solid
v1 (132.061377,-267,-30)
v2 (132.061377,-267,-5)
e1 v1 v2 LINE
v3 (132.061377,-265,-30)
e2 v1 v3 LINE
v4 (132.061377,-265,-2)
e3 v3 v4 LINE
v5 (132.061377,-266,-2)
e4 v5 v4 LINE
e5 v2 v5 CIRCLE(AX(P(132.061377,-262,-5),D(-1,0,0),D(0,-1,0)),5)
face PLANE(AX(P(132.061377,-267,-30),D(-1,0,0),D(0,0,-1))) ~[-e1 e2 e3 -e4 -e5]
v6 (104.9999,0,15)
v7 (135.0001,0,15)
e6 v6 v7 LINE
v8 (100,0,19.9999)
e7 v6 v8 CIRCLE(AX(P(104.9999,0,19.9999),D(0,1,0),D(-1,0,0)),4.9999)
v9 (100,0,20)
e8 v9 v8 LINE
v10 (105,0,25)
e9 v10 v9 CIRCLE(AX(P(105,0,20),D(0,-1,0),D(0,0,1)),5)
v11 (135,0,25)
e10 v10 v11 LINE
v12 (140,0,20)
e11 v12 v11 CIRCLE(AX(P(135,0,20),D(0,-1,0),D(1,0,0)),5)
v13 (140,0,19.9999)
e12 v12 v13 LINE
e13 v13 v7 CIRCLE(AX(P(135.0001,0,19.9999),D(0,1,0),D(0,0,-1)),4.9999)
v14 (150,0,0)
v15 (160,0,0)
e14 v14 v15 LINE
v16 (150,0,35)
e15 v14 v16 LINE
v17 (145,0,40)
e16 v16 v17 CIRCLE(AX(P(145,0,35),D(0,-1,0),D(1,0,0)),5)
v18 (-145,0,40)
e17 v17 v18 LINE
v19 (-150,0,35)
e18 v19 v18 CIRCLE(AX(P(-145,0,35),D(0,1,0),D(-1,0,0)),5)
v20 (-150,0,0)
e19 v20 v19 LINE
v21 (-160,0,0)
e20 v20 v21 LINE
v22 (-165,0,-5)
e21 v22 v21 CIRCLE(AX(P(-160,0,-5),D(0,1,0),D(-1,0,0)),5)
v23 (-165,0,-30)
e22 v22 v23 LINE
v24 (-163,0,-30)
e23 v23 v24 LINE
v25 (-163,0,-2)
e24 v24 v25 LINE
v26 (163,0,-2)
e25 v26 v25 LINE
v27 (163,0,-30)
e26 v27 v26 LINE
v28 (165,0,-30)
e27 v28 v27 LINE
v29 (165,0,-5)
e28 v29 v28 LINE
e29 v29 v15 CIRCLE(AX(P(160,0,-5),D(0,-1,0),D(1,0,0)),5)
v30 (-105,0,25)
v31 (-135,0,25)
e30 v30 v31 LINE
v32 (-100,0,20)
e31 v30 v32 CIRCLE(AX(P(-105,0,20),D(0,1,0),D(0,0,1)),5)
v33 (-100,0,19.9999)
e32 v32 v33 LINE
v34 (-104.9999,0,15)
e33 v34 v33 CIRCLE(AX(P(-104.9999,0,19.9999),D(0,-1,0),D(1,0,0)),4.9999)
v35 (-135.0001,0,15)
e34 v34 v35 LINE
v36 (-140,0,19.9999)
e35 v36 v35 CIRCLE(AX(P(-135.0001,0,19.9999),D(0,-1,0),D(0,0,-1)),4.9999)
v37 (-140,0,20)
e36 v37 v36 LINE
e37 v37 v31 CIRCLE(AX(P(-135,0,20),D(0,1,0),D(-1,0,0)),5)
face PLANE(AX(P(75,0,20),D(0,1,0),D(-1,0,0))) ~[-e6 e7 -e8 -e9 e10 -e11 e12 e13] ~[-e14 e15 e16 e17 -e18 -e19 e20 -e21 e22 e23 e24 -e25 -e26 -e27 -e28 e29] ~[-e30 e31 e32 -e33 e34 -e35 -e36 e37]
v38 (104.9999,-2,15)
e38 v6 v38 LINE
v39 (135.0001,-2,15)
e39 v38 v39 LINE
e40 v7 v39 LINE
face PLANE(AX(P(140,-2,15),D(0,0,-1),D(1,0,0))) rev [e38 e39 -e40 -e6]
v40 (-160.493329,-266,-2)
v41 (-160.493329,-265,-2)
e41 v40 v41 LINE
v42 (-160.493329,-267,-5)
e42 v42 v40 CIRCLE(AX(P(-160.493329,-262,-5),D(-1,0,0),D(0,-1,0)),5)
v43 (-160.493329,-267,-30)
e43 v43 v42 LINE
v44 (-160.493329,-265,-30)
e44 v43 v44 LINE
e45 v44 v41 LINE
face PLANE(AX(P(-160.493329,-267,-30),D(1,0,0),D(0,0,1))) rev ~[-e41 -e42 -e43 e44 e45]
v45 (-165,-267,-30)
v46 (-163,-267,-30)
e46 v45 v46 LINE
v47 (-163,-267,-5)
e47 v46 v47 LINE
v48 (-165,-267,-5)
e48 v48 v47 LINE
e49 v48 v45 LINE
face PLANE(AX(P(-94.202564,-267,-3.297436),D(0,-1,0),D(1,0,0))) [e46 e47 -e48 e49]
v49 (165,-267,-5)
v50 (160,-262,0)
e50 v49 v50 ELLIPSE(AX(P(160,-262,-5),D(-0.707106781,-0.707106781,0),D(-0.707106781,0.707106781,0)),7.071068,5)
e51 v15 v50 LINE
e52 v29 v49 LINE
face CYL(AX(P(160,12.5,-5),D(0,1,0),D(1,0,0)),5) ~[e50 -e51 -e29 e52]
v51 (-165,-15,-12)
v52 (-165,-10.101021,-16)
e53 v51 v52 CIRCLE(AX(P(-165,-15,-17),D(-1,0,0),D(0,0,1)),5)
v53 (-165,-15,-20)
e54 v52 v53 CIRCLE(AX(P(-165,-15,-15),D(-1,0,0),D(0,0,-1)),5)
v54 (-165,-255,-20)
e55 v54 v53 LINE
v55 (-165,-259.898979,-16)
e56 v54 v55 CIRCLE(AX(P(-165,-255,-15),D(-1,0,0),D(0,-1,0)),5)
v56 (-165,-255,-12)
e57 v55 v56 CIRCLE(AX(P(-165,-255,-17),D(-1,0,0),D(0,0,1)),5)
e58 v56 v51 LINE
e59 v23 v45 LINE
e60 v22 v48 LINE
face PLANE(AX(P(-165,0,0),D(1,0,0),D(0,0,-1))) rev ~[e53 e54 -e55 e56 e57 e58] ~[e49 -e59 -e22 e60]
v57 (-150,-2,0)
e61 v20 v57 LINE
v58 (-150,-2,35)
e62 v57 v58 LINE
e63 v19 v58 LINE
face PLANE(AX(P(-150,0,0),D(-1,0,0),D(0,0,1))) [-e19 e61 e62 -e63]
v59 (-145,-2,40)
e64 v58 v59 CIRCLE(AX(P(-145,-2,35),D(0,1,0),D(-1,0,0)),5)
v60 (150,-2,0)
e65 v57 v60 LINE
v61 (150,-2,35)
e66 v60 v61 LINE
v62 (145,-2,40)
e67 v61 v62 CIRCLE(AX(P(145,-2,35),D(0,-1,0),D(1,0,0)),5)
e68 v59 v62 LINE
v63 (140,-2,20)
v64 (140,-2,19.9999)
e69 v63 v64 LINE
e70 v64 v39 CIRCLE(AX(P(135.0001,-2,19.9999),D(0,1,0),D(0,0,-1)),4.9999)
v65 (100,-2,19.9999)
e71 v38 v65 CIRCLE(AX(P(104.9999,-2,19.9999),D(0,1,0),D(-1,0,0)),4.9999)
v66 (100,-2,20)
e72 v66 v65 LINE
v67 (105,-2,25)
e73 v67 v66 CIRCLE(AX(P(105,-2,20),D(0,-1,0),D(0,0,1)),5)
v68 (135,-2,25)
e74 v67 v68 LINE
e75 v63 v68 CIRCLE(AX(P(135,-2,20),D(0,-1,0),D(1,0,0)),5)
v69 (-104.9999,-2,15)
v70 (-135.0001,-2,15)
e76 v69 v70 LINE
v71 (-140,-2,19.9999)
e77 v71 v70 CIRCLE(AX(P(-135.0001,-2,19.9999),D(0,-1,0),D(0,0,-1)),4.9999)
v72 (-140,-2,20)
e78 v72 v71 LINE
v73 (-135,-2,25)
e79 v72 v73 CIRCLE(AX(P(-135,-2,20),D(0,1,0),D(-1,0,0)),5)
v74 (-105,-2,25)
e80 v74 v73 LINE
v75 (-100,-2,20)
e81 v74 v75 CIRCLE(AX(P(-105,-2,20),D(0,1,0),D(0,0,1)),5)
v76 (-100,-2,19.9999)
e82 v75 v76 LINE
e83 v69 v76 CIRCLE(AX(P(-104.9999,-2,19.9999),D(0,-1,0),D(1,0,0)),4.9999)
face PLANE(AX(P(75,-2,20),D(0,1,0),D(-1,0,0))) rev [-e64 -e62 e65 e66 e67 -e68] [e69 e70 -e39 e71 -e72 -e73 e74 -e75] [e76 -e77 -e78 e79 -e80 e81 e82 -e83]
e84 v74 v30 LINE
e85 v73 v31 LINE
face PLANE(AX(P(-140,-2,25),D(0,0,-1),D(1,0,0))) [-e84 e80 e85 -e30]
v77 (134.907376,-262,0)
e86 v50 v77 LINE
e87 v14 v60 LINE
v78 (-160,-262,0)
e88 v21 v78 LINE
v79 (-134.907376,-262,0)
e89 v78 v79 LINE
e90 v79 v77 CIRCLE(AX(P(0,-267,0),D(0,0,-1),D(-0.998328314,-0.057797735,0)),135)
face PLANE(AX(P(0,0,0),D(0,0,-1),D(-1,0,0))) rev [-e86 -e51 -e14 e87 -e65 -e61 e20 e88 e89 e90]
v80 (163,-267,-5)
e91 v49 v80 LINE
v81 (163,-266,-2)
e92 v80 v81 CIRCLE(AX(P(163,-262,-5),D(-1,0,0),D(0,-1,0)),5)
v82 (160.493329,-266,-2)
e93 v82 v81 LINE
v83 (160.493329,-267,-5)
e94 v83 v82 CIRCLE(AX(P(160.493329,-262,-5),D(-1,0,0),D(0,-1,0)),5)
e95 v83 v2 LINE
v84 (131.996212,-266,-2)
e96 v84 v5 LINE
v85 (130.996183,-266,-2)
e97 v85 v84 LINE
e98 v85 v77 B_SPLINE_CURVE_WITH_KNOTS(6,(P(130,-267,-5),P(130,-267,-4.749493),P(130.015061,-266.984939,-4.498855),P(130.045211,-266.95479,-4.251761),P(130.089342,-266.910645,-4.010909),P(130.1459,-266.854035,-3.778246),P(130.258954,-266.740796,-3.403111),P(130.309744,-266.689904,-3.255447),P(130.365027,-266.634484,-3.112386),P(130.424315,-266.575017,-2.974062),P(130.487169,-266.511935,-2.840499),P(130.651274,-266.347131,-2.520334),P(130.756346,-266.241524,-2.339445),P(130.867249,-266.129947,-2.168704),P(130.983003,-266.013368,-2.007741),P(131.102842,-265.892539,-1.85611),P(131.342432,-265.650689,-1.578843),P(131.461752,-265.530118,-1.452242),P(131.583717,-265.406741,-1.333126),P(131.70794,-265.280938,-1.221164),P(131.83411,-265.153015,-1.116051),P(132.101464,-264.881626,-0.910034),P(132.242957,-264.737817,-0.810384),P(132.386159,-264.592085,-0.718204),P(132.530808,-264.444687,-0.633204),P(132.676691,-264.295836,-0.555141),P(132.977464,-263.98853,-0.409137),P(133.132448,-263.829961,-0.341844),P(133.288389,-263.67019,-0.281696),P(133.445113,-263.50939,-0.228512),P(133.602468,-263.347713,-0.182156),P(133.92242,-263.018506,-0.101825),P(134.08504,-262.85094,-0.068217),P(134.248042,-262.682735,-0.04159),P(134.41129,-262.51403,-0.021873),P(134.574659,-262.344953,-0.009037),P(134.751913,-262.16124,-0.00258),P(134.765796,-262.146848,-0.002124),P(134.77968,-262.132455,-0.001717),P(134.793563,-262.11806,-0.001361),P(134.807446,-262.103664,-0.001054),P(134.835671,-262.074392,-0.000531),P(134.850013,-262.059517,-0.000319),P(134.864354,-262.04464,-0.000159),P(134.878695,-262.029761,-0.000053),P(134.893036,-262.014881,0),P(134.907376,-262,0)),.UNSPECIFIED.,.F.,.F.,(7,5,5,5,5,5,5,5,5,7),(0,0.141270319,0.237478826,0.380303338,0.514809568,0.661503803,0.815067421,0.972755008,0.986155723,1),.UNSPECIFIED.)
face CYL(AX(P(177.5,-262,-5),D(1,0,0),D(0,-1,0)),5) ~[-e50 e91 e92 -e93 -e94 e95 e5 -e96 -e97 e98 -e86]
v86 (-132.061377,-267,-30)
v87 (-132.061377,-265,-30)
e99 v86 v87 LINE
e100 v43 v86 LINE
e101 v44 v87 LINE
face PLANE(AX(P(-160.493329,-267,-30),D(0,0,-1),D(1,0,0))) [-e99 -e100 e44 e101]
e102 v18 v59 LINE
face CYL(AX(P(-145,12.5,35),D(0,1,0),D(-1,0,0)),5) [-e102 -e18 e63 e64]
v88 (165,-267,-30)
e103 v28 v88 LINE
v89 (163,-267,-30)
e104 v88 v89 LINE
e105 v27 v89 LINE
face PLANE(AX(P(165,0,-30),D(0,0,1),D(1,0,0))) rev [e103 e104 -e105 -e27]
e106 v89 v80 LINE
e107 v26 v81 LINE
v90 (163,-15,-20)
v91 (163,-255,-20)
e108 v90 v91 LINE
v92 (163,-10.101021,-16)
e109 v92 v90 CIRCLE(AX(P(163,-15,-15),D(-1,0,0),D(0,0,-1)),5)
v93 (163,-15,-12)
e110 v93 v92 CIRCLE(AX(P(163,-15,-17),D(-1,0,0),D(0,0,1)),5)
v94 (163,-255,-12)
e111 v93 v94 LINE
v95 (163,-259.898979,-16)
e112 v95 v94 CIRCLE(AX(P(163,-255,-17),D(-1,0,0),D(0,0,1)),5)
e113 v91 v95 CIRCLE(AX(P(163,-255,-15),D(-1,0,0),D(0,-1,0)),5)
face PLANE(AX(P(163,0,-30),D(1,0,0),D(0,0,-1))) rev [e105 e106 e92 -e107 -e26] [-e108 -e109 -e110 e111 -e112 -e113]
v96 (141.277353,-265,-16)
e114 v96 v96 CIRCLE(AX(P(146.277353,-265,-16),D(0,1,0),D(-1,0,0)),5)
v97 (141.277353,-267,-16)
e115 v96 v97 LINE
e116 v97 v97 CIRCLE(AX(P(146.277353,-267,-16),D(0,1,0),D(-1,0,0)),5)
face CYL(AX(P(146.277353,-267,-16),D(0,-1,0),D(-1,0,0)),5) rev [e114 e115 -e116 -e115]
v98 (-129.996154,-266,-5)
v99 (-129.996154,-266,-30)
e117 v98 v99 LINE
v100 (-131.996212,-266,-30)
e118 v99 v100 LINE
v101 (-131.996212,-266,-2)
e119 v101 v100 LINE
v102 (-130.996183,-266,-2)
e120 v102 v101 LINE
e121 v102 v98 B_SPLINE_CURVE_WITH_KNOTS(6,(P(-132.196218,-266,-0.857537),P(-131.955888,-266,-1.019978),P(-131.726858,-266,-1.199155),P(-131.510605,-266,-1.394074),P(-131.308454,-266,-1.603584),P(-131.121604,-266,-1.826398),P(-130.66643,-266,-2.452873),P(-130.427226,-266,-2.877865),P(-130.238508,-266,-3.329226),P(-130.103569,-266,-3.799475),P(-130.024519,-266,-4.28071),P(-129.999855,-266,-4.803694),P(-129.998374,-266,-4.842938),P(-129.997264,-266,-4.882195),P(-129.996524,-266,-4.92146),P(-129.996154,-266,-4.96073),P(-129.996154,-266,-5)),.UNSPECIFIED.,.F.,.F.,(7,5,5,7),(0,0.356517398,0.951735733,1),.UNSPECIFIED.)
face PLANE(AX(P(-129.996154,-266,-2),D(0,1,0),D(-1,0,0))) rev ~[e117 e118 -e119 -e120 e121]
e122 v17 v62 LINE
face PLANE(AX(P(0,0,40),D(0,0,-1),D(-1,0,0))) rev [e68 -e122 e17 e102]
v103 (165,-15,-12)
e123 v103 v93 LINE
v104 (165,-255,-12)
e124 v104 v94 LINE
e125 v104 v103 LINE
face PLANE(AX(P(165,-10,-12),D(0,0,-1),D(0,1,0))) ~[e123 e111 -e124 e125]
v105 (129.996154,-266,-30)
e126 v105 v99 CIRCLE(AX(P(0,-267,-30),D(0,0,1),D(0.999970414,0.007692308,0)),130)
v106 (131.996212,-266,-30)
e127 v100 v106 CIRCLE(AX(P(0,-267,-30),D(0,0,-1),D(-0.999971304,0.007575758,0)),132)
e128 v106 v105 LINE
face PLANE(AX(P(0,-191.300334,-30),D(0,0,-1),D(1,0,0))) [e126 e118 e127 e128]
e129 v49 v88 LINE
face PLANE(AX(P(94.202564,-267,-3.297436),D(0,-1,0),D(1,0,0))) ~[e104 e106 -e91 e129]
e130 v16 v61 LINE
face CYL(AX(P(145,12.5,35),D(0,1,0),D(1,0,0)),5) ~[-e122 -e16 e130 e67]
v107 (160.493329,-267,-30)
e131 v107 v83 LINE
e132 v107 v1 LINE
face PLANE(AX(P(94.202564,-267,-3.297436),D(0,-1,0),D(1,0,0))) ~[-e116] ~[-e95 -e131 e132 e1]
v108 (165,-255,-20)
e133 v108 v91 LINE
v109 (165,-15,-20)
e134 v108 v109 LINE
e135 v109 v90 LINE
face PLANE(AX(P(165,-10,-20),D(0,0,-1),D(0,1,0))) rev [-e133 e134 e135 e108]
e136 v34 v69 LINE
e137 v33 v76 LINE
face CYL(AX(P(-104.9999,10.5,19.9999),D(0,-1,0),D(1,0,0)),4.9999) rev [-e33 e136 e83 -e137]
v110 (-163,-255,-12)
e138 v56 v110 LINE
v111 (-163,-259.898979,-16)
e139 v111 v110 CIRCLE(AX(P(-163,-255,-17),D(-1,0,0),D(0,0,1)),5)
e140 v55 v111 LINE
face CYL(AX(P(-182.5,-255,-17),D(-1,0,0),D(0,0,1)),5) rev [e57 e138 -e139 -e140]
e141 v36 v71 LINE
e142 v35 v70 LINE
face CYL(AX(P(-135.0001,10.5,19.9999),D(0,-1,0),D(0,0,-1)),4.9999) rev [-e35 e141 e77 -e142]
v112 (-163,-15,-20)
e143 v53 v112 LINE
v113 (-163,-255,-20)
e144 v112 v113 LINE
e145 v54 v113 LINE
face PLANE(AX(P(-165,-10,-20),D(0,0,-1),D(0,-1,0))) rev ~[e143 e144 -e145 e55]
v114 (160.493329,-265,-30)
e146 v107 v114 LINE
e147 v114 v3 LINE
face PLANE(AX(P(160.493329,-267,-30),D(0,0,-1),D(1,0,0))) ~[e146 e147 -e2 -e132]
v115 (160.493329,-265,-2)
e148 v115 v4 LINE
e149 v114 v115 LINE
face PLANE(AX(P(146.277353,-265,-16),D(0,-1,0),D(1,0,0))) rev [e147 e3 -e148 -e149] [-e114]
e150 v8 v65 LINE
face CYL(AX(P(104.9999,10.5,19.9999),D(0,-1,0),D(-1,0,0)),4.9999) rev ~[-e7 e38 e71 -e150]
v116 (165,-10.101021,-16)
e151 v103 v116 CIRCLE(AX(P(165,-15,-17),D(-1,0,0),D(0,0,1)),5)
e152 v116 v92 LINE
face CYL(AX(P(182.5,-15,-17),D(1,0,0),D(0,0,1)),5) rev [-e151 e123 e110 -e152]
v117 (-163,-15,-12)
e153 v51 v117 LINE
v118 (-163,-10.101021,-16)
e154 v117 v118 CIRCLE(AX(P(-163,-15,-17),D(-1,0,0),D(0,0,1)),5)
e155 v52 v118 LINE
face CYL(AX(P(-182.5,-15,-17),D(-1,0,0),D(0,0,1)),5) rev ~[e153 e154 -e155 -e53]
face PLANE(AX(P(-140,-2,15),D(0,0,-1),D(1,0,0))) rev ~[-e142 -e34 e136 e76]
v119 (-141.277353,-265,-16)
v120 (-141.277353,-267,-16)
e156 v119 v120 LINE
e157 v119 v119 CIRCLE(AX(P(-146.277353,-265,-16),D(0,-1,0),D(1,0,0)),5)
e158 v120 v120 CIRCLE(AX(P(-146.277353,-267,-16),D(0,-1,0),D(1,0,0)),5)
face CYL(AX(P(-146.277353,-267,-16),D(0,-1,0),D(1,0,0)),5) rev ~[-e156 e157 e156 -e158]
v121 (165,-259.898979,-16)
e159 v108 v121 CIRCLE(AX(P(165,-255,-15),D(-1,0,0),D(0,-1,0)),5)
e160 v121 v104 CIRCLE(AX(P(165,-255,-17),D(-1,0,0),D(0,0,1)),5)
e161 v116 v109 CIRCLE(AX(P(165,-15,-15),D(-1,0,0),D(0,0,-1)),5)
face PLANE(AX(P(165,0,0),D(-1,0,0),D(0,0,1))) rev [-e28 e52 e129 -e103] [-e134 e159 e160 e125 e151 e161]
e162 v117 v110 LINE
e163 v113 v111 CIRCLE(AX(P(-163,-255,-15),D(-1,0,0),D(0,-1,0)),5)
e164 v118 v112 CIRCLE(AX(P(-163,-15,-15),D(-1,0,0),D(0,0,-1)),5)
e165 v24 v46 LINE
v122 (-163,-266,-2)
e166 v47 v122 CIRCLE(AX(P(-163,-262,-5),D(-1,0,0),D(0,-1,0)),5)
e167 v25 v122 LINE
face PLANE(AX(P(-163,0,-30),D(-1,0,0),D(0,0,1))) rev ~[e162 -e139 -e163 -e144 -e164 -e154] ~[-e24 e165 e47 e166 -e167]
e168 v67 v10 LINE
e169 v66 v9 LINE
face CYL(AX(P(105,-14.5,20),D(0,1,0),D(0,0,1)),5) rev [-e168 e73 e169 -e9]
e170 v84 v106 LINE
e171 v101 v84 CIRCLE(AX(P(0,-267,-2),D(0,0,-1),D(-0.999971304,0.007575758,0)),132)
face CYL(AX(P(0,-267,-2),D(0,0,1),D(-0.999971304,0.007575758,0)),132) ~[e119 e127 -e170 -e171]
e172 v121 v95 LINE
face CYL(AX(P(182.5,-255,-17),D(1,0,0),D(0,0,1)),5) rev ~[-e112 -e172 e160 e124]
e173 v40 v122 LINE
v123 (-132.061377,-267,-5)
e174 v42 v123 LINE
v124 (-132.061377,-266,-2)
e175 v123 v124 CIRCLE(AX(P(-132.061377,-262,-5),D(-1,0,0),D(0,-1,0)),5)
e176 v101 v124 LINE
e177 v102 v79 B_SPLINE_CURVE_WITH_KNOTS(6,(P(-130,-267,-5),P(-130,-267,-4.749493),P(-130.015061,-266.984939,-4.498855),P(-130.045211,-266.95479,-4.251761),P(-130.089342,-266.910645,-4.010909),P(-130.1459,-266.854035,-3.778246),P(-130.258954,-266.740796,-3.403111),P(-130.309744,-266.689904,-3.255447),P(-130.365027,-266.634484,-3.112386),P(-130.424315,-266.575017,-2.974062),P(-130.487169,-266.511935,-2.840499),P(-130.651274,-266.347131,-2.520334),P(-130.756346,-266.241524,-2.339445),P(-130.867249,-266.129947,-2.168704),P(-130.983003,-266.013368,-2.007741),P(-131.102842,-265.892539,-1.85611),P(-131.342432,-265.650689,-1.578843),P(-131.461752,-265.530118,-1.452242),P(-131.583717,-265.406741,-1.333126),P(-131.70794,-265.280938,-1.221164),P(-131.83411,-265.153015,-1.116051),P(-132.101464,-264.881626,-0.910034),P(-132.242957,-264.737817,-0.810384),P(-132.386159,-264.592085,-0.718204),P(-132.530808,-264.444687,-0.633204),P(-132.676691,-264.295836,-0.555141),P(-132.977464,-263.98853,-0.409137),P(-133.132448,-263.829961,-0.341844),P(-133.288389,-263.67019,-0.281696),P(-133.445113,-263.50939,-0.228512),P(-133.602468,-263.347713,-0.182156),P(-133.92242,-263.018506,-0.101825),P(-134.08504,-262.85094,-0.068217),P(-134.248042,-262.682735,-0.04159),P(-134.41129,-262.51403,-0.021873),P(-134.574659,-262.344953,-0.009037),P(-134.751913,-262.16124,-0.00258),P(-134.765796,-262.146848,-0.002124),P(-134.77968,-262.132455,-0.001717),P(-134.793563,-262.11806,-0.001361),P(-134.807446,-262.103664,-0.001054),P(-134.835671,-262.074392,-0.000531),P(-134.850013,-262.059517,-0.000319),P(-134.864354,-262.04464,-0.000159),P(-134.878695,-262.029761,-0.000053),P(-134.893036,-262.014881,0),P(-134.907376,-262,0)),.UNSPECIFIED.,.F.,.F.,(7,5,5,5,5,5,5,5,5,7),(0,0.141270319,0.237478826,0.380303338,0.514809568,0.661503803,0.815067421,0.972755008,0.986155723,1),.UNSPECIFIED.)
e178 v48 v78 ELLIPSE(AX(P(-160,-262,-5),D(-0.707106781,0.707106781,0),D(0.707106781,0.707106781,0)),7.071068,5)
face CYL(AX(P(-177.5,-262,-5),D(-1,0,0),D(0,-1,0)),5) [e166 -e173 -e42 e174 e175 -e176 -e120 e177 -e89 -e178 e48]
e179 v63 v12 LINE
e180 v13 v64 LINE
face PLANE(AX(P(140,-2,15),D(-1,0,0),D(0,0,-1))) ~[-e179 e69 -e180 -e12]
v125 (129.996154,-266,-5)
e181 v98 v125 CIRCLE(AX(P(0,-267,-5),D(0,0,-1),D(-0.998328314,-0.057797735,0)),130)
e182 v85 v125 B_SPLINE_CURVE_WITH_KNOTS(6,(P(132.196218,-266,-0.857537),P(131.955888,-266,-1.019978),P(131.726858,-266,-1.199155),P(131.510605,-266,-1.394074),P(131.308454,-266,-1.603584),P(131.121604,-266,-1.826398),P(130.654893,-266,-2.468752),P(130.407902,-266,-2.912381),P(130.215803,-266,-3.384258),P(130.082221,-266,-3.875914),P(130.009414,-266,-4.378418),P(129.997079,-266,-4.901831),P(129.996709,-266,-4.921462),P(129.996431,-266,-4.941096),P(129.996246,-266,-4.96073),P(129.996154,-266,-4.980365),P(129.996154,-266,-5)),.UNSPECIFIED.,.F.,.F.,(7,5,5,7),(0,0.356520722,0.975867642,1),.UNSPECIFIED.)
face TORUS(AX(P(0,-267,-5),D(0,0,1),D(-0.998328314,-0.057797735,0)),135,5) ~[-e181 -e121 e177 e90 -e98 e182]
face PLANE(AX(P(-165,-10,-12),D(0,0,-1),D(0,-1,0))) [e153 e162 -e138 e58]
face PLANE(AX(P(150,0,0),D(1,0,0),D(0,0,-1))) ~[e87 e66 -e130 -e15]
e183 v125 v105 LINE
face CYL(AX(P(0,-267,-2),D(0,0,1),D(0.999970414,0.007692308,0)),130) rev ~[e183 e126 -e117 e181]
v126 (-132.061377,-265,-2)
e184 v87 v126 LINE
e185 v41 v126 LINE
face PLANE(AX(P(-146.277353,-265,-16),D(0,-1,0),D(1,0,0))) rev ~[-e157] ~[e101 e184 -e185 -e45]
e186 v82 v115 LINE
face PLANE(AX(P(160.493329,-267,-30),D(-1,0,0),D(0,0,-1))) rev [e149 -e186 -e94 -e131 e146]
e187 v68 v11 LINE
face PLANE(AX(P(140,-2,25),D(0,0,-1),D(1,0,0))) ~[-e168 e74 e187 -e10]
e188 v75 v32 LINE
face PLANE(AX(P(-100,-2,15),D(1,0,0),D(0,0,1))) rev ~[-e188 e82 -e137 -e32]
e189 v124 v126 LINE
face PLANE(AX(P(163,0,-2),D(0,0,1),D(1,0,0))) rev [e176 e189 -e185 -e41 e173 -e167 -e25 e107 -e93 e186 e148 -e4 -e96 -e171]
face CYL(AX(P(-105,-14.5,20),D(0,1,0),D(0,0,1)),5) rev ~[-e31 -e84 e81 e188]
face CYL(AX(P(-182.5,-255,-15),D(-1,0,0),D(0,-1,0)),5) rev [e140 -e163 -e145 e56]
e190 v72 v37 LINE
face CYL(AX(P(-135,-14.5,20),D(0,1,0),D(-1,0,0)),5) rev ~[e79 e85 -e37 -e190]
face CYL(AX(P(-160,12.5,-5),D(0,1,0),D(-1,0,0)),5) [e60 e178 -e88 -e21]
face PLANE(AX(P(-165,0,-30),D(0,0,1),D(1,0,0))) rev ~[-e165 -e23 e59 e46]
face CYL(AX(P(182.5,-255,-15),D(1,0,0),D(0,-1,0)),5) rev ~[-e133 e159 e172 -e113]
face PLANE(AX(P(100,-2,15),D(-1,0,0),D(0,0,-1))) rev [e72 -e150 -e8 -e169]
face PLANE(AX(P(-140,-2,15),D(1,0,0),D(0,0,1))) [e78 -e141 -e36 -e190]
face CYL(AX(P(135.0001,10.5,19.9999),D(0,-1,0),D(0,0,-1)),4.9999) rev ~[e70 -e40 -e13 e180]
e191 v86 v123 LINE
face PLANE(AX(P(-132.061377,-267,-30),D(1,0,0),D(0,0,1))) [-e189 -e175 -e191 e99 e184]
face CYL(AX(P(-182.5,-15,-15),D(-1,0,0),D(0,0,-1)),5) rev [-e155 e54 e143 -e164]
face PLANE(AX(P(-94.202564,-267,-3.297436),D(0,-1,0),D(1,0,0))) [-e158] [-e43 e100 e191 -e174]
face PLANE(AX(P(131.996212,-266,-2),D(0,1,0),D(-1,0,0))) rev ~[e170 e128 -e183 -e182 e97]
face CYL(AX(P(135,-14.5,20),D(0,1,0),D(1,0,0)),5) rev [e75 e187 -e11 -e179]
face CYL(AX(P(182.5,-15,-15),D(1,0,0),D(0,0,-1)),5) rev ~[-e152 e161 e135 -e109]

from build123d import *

# Parameters (mm, degrees)
F1_DEPTH       = 267
F2_W           = 250
F2_H           = 8
F3_DEPTH       = 5
F4_R           = 130
F5_DEPTH       = 12.5
F6_W           = 150
F6_H           = 40
F7_DEPTH       = 2
F8_W           = 40
F8_H           = 10
F9_DEPTH       = 12.5
F10_F1_R       = 5
F10_F2_R       = 5
F10_F3_R       = 4.9999
F10_F4_R       = 4.9999
F10_2_T1_DEPTH = 35
F11_W          = 28.4319519997
F11_H          = 28
F12_DEPTH      = 2
F13_R          = 5
F14_DEPTH      = 5
F17_T1_DEPTH   = 27
F17_T3_DEPTH   = 292
F17_T5_DEPTH   = 60
F20_DEPTH      = 28
F21_T2_ANGLE   = 186.62682558


# Not quite as in the source:
# - a fillet or chamfer that OpenCascade refuses, or shapes differently, is made with other operations: its cross-section is extruded or revolved along the edge and cut away or added
# - a fillet or chamfer is up to 0.001 mm smaller than in the source, because OpenCascade refuses the exact size


with BuildPart() as f1:
    # F0 (on Front) → F1 (new body)
    with BuildSketch(Plane.XZ):
        Polygon((-165, -30), (-163, -30), (-163, -2), (0, -2), (0, 0), (-165, 0), align=None)
    extrude(amount=F1_DEPTH)


with BuildPart() as f3:
    # F2 (on face) → F3 (new body, symmetric)
    with BuildSketch(Plane(origin=(-165, 0, 0), x_dir=(0, -1, 0), z_dir=(-1, 0, 0))):
        with Locations((135, -16)):
            Rectangle(F2_W, F2_H)
    extrude(amount=F3_DEPTH, both=True)

    # F10#2: fillet of radius 5 on 4 edges, made by hand

    # F10_2_s2 → F10_2_t1 (cut)
    with BuildSketch(Plane.YZ.offset(-182.5)):
        with BuildLine():
            ThreePointArc((-15, -12), (-11.4644660941, -13.4644660941), (-10, -17))
            Line((-10, -17), (-10, -12))
            Line((-10, -12), (-15, -12))
        make_face()
        with BuildLine():
            ThreePointArc((-15, -20), (-11.4644660941, -18.5355339059), (-10, -15))
            Line((-10, -15), (-10, -20))
            Line((-10, -20), (-15, -20))
        make_face()
        with BuildLine():
            ThreePointArc((-260, -15), (-258.5355339059, -18.5355339059), (-255, -20))
            Line((-255, -20), (-260, -20))
            Line((-260, -20), (-260, -15))
        make_face()
        with BuildLine():
            ThreePointArc((-255, -12), (-258.5355339059, -13.4644660941), (-260, -17))
            Line((-260, -17), (-260, -12))
            Line((-260, -12), (-255, -12))
        make_face()
    extrude(amount=F10_2_T1_DEPTH, mode=Mode.SUBTRACT)


with BuildPart() as f5:
    # F4 (on face) → F5 (new body, symmetric)
    with BuildSketch(Plane.XY):
        with Locations((0, -267)):
            Circle(F4_R)
    extrude(amount=F5_DEPTH, both=True)


with BuildPart() as f7:
    # F6 (on face) → F7 (new body)
    with BuildSketch(Plane(origin=(0, 0, 0), x_dir=(-1, 0, 0), z_dir=(0, 1, 0))):
        with Locations((75, 20)):
            Rectangle(F6_W, F6_H)
    extrude(amount=-F7_DEPTH)


with BuildPart() as f9:
    # F8 (on face) → F9 (new body, symmetric)
    with BuildSketch(Plane.XZ.offset(2)):
        with Locations((-120, 20)):
            Rectangle(F8_W, F8_H)
    extrude(amount=F9_DEPTH, both=True)

    # F10: fillet of radius 5 on 4 edges, made by hand

    # F10_f1
    f10_f1_edges = [f9.edges().sort_by_distance(p)[0] for p in [
        (-140, -2, 25),
    ]]
    fillet(f10_f1_edges, radius=F10_F1_R)

    # F10_f2
    f10_f2_edges = [f9.edges().sort_by_distance(p)[0] for p in [
        (-100, -2, 25),
    ]]
    fillet(f10_f2_edges, radius=F10_F2_R)

    # F10_f3 (radius 5 in the source; OpenCascade refuses exactly that, so slightly less here)
    f10_f3_edges = [f9.edges().sort_by_distance(p)[0] for p in [
        (-100, -2, 15),
    ]]
    fillet(f10_f3_edges, radius=F10_F3_R)

    # F10_f4 (radius 5 in the source; OpenCascade refuses exactly that, so slightly less here)
    f10_f4_edges = [f9.edges().sort_by_distance(p)[0] for p in [
        (-140, -2, 15),
    ]]
    fillet(f10_f4_edges, radius=F10_F4_R)


with BuildPart() as f12:
    # F11 (on face) → F12 (new body)
    with BuildSketch(Plane.XZ.offset(267)):
        with Locations((-146.2773531675, -16)):
            Rectangle(F11_W, F11_H)
    extrude(amount=-F12_DEPTH)


with BuildPart() as f14:
    # F13 (on face) → F14 (new body, symmetric)
    with BuildSketch(Plane.XZ.offset(267)):
        with Locations((-146.2773531675, -16)):
            Circle(F13_R)
    extrude(amount=F14_DEPTH, both=True)


with BuildPart() as f1_1:
    add(f1.part)

    # F15: union F7, F12
    add(f7.part)
    add(f12.part)

    # F16: cut F9, F3, F5, F14
    add(f9.part, mode=Mode.SUBTRACT)
    add(f3.part, mode=Mode.SUBTRACT)
    add(f5.part, mode=Mode.SUBTRACT)
    add(f14.part, mode=Mode.SUBTRACT)

    # F17: fillet of radius 5 on 3 edges, made by hand

    # F17_s2 → F17_t1 (cut)
    with BuildSketch(Plane.XZ.offset(-12.5)):
        with BuildLine():
            ThreePointArc((-150, 35), (-148.5355339059, 38.5355339059), (-145, 40))
            Line((-145, 40), (-150, 40))
            Line((-150, 40), (-150, 35))
        make_face()
    extrude(amount=F17_T1_DEPTH, mode=Mode.SUBTRACT)

    # F17_s4 → F17_t3 (cut)
    with BuildSketch(Plane.XZ.offset(-12.5)):
        with BuildLine():
            ThreePointArc((-165, -5), (-163.5355339059, -1.4644660941), (-160, 0))
            Line((-160, 0), (-165, 0))
            Line((-165, 0), (-165, -5))
        make_face()
    extrude(amount=F17_T3_DEPTH, mode=Mode.SUBTRACT)

    # F17_s6 → F17_t5 (cut)
    with BuildSketch(Plane.YZ.offset(-177.5)):
        with BuildLine():
            ThreePointArc((-267, -5), (-265.5355339059, -1.4644660941), (-262, 0))
            Line((-262, 0), (-267, 0))
            Line((-267, 0), (-267, -5))
        make_face()
    extrude(amount=F17_T5_DEPTH, mode=Mode.SUBTRACT)

    # F18: F1 across plane


with BuildPart() as f1_2:
    add(f1_1.part)
    add(f1_1.part.mirror(Plane.YZ))

    # F19 (on face) → F20 (join)
    with BuildSketch(Plane(origin=(0, 0, -2), x_dir=(1, 0, 0), z_dir=(0, 0, -1))):
        with BuildLine():
            ThreePointArc((129.9961537893, 266), (0, 137), (-129.9961537893, 266))
            Line((-129.9961537893, 266), (-131.9962120669, 266))
            ThreePointArc((-131.9962120669, 266), (0, 135), (131.9962120669, 266))
            Line((131.9962120669, 266), (129.9961537893, 266))
        make_face()
    extrude(amount=F20_DEPTH)

    # F21: fillet of radius 5 on 1 edges, made by hand

    # F21_s1 → F21_t2 (revolve, cut)
    with BuildSketch(Plane(origin=(15.4061976699, -266.1080656422, 0), x_dir=(0, 0, 1), z_dir=(0.0577977346, -0.9983283137, 0))):
        with BuildLine():
            ThreePointArc((0, 150.4319951252), (-1.4644660941, 146.8964612192), (-5, 145.4319951252))
            Line((-5, 145.4319951252), (0, 145.4319951252))
            Line((0, 145.4319951252), (0, 150.4319951252))
        make_face()
    revolve(axis=Axis((0, -267, 0), (0, 0, -1)), revolution_arc=F21_T2_ANGLE, mode=Mode.SUBTRACT)


solid = f1_2.part
